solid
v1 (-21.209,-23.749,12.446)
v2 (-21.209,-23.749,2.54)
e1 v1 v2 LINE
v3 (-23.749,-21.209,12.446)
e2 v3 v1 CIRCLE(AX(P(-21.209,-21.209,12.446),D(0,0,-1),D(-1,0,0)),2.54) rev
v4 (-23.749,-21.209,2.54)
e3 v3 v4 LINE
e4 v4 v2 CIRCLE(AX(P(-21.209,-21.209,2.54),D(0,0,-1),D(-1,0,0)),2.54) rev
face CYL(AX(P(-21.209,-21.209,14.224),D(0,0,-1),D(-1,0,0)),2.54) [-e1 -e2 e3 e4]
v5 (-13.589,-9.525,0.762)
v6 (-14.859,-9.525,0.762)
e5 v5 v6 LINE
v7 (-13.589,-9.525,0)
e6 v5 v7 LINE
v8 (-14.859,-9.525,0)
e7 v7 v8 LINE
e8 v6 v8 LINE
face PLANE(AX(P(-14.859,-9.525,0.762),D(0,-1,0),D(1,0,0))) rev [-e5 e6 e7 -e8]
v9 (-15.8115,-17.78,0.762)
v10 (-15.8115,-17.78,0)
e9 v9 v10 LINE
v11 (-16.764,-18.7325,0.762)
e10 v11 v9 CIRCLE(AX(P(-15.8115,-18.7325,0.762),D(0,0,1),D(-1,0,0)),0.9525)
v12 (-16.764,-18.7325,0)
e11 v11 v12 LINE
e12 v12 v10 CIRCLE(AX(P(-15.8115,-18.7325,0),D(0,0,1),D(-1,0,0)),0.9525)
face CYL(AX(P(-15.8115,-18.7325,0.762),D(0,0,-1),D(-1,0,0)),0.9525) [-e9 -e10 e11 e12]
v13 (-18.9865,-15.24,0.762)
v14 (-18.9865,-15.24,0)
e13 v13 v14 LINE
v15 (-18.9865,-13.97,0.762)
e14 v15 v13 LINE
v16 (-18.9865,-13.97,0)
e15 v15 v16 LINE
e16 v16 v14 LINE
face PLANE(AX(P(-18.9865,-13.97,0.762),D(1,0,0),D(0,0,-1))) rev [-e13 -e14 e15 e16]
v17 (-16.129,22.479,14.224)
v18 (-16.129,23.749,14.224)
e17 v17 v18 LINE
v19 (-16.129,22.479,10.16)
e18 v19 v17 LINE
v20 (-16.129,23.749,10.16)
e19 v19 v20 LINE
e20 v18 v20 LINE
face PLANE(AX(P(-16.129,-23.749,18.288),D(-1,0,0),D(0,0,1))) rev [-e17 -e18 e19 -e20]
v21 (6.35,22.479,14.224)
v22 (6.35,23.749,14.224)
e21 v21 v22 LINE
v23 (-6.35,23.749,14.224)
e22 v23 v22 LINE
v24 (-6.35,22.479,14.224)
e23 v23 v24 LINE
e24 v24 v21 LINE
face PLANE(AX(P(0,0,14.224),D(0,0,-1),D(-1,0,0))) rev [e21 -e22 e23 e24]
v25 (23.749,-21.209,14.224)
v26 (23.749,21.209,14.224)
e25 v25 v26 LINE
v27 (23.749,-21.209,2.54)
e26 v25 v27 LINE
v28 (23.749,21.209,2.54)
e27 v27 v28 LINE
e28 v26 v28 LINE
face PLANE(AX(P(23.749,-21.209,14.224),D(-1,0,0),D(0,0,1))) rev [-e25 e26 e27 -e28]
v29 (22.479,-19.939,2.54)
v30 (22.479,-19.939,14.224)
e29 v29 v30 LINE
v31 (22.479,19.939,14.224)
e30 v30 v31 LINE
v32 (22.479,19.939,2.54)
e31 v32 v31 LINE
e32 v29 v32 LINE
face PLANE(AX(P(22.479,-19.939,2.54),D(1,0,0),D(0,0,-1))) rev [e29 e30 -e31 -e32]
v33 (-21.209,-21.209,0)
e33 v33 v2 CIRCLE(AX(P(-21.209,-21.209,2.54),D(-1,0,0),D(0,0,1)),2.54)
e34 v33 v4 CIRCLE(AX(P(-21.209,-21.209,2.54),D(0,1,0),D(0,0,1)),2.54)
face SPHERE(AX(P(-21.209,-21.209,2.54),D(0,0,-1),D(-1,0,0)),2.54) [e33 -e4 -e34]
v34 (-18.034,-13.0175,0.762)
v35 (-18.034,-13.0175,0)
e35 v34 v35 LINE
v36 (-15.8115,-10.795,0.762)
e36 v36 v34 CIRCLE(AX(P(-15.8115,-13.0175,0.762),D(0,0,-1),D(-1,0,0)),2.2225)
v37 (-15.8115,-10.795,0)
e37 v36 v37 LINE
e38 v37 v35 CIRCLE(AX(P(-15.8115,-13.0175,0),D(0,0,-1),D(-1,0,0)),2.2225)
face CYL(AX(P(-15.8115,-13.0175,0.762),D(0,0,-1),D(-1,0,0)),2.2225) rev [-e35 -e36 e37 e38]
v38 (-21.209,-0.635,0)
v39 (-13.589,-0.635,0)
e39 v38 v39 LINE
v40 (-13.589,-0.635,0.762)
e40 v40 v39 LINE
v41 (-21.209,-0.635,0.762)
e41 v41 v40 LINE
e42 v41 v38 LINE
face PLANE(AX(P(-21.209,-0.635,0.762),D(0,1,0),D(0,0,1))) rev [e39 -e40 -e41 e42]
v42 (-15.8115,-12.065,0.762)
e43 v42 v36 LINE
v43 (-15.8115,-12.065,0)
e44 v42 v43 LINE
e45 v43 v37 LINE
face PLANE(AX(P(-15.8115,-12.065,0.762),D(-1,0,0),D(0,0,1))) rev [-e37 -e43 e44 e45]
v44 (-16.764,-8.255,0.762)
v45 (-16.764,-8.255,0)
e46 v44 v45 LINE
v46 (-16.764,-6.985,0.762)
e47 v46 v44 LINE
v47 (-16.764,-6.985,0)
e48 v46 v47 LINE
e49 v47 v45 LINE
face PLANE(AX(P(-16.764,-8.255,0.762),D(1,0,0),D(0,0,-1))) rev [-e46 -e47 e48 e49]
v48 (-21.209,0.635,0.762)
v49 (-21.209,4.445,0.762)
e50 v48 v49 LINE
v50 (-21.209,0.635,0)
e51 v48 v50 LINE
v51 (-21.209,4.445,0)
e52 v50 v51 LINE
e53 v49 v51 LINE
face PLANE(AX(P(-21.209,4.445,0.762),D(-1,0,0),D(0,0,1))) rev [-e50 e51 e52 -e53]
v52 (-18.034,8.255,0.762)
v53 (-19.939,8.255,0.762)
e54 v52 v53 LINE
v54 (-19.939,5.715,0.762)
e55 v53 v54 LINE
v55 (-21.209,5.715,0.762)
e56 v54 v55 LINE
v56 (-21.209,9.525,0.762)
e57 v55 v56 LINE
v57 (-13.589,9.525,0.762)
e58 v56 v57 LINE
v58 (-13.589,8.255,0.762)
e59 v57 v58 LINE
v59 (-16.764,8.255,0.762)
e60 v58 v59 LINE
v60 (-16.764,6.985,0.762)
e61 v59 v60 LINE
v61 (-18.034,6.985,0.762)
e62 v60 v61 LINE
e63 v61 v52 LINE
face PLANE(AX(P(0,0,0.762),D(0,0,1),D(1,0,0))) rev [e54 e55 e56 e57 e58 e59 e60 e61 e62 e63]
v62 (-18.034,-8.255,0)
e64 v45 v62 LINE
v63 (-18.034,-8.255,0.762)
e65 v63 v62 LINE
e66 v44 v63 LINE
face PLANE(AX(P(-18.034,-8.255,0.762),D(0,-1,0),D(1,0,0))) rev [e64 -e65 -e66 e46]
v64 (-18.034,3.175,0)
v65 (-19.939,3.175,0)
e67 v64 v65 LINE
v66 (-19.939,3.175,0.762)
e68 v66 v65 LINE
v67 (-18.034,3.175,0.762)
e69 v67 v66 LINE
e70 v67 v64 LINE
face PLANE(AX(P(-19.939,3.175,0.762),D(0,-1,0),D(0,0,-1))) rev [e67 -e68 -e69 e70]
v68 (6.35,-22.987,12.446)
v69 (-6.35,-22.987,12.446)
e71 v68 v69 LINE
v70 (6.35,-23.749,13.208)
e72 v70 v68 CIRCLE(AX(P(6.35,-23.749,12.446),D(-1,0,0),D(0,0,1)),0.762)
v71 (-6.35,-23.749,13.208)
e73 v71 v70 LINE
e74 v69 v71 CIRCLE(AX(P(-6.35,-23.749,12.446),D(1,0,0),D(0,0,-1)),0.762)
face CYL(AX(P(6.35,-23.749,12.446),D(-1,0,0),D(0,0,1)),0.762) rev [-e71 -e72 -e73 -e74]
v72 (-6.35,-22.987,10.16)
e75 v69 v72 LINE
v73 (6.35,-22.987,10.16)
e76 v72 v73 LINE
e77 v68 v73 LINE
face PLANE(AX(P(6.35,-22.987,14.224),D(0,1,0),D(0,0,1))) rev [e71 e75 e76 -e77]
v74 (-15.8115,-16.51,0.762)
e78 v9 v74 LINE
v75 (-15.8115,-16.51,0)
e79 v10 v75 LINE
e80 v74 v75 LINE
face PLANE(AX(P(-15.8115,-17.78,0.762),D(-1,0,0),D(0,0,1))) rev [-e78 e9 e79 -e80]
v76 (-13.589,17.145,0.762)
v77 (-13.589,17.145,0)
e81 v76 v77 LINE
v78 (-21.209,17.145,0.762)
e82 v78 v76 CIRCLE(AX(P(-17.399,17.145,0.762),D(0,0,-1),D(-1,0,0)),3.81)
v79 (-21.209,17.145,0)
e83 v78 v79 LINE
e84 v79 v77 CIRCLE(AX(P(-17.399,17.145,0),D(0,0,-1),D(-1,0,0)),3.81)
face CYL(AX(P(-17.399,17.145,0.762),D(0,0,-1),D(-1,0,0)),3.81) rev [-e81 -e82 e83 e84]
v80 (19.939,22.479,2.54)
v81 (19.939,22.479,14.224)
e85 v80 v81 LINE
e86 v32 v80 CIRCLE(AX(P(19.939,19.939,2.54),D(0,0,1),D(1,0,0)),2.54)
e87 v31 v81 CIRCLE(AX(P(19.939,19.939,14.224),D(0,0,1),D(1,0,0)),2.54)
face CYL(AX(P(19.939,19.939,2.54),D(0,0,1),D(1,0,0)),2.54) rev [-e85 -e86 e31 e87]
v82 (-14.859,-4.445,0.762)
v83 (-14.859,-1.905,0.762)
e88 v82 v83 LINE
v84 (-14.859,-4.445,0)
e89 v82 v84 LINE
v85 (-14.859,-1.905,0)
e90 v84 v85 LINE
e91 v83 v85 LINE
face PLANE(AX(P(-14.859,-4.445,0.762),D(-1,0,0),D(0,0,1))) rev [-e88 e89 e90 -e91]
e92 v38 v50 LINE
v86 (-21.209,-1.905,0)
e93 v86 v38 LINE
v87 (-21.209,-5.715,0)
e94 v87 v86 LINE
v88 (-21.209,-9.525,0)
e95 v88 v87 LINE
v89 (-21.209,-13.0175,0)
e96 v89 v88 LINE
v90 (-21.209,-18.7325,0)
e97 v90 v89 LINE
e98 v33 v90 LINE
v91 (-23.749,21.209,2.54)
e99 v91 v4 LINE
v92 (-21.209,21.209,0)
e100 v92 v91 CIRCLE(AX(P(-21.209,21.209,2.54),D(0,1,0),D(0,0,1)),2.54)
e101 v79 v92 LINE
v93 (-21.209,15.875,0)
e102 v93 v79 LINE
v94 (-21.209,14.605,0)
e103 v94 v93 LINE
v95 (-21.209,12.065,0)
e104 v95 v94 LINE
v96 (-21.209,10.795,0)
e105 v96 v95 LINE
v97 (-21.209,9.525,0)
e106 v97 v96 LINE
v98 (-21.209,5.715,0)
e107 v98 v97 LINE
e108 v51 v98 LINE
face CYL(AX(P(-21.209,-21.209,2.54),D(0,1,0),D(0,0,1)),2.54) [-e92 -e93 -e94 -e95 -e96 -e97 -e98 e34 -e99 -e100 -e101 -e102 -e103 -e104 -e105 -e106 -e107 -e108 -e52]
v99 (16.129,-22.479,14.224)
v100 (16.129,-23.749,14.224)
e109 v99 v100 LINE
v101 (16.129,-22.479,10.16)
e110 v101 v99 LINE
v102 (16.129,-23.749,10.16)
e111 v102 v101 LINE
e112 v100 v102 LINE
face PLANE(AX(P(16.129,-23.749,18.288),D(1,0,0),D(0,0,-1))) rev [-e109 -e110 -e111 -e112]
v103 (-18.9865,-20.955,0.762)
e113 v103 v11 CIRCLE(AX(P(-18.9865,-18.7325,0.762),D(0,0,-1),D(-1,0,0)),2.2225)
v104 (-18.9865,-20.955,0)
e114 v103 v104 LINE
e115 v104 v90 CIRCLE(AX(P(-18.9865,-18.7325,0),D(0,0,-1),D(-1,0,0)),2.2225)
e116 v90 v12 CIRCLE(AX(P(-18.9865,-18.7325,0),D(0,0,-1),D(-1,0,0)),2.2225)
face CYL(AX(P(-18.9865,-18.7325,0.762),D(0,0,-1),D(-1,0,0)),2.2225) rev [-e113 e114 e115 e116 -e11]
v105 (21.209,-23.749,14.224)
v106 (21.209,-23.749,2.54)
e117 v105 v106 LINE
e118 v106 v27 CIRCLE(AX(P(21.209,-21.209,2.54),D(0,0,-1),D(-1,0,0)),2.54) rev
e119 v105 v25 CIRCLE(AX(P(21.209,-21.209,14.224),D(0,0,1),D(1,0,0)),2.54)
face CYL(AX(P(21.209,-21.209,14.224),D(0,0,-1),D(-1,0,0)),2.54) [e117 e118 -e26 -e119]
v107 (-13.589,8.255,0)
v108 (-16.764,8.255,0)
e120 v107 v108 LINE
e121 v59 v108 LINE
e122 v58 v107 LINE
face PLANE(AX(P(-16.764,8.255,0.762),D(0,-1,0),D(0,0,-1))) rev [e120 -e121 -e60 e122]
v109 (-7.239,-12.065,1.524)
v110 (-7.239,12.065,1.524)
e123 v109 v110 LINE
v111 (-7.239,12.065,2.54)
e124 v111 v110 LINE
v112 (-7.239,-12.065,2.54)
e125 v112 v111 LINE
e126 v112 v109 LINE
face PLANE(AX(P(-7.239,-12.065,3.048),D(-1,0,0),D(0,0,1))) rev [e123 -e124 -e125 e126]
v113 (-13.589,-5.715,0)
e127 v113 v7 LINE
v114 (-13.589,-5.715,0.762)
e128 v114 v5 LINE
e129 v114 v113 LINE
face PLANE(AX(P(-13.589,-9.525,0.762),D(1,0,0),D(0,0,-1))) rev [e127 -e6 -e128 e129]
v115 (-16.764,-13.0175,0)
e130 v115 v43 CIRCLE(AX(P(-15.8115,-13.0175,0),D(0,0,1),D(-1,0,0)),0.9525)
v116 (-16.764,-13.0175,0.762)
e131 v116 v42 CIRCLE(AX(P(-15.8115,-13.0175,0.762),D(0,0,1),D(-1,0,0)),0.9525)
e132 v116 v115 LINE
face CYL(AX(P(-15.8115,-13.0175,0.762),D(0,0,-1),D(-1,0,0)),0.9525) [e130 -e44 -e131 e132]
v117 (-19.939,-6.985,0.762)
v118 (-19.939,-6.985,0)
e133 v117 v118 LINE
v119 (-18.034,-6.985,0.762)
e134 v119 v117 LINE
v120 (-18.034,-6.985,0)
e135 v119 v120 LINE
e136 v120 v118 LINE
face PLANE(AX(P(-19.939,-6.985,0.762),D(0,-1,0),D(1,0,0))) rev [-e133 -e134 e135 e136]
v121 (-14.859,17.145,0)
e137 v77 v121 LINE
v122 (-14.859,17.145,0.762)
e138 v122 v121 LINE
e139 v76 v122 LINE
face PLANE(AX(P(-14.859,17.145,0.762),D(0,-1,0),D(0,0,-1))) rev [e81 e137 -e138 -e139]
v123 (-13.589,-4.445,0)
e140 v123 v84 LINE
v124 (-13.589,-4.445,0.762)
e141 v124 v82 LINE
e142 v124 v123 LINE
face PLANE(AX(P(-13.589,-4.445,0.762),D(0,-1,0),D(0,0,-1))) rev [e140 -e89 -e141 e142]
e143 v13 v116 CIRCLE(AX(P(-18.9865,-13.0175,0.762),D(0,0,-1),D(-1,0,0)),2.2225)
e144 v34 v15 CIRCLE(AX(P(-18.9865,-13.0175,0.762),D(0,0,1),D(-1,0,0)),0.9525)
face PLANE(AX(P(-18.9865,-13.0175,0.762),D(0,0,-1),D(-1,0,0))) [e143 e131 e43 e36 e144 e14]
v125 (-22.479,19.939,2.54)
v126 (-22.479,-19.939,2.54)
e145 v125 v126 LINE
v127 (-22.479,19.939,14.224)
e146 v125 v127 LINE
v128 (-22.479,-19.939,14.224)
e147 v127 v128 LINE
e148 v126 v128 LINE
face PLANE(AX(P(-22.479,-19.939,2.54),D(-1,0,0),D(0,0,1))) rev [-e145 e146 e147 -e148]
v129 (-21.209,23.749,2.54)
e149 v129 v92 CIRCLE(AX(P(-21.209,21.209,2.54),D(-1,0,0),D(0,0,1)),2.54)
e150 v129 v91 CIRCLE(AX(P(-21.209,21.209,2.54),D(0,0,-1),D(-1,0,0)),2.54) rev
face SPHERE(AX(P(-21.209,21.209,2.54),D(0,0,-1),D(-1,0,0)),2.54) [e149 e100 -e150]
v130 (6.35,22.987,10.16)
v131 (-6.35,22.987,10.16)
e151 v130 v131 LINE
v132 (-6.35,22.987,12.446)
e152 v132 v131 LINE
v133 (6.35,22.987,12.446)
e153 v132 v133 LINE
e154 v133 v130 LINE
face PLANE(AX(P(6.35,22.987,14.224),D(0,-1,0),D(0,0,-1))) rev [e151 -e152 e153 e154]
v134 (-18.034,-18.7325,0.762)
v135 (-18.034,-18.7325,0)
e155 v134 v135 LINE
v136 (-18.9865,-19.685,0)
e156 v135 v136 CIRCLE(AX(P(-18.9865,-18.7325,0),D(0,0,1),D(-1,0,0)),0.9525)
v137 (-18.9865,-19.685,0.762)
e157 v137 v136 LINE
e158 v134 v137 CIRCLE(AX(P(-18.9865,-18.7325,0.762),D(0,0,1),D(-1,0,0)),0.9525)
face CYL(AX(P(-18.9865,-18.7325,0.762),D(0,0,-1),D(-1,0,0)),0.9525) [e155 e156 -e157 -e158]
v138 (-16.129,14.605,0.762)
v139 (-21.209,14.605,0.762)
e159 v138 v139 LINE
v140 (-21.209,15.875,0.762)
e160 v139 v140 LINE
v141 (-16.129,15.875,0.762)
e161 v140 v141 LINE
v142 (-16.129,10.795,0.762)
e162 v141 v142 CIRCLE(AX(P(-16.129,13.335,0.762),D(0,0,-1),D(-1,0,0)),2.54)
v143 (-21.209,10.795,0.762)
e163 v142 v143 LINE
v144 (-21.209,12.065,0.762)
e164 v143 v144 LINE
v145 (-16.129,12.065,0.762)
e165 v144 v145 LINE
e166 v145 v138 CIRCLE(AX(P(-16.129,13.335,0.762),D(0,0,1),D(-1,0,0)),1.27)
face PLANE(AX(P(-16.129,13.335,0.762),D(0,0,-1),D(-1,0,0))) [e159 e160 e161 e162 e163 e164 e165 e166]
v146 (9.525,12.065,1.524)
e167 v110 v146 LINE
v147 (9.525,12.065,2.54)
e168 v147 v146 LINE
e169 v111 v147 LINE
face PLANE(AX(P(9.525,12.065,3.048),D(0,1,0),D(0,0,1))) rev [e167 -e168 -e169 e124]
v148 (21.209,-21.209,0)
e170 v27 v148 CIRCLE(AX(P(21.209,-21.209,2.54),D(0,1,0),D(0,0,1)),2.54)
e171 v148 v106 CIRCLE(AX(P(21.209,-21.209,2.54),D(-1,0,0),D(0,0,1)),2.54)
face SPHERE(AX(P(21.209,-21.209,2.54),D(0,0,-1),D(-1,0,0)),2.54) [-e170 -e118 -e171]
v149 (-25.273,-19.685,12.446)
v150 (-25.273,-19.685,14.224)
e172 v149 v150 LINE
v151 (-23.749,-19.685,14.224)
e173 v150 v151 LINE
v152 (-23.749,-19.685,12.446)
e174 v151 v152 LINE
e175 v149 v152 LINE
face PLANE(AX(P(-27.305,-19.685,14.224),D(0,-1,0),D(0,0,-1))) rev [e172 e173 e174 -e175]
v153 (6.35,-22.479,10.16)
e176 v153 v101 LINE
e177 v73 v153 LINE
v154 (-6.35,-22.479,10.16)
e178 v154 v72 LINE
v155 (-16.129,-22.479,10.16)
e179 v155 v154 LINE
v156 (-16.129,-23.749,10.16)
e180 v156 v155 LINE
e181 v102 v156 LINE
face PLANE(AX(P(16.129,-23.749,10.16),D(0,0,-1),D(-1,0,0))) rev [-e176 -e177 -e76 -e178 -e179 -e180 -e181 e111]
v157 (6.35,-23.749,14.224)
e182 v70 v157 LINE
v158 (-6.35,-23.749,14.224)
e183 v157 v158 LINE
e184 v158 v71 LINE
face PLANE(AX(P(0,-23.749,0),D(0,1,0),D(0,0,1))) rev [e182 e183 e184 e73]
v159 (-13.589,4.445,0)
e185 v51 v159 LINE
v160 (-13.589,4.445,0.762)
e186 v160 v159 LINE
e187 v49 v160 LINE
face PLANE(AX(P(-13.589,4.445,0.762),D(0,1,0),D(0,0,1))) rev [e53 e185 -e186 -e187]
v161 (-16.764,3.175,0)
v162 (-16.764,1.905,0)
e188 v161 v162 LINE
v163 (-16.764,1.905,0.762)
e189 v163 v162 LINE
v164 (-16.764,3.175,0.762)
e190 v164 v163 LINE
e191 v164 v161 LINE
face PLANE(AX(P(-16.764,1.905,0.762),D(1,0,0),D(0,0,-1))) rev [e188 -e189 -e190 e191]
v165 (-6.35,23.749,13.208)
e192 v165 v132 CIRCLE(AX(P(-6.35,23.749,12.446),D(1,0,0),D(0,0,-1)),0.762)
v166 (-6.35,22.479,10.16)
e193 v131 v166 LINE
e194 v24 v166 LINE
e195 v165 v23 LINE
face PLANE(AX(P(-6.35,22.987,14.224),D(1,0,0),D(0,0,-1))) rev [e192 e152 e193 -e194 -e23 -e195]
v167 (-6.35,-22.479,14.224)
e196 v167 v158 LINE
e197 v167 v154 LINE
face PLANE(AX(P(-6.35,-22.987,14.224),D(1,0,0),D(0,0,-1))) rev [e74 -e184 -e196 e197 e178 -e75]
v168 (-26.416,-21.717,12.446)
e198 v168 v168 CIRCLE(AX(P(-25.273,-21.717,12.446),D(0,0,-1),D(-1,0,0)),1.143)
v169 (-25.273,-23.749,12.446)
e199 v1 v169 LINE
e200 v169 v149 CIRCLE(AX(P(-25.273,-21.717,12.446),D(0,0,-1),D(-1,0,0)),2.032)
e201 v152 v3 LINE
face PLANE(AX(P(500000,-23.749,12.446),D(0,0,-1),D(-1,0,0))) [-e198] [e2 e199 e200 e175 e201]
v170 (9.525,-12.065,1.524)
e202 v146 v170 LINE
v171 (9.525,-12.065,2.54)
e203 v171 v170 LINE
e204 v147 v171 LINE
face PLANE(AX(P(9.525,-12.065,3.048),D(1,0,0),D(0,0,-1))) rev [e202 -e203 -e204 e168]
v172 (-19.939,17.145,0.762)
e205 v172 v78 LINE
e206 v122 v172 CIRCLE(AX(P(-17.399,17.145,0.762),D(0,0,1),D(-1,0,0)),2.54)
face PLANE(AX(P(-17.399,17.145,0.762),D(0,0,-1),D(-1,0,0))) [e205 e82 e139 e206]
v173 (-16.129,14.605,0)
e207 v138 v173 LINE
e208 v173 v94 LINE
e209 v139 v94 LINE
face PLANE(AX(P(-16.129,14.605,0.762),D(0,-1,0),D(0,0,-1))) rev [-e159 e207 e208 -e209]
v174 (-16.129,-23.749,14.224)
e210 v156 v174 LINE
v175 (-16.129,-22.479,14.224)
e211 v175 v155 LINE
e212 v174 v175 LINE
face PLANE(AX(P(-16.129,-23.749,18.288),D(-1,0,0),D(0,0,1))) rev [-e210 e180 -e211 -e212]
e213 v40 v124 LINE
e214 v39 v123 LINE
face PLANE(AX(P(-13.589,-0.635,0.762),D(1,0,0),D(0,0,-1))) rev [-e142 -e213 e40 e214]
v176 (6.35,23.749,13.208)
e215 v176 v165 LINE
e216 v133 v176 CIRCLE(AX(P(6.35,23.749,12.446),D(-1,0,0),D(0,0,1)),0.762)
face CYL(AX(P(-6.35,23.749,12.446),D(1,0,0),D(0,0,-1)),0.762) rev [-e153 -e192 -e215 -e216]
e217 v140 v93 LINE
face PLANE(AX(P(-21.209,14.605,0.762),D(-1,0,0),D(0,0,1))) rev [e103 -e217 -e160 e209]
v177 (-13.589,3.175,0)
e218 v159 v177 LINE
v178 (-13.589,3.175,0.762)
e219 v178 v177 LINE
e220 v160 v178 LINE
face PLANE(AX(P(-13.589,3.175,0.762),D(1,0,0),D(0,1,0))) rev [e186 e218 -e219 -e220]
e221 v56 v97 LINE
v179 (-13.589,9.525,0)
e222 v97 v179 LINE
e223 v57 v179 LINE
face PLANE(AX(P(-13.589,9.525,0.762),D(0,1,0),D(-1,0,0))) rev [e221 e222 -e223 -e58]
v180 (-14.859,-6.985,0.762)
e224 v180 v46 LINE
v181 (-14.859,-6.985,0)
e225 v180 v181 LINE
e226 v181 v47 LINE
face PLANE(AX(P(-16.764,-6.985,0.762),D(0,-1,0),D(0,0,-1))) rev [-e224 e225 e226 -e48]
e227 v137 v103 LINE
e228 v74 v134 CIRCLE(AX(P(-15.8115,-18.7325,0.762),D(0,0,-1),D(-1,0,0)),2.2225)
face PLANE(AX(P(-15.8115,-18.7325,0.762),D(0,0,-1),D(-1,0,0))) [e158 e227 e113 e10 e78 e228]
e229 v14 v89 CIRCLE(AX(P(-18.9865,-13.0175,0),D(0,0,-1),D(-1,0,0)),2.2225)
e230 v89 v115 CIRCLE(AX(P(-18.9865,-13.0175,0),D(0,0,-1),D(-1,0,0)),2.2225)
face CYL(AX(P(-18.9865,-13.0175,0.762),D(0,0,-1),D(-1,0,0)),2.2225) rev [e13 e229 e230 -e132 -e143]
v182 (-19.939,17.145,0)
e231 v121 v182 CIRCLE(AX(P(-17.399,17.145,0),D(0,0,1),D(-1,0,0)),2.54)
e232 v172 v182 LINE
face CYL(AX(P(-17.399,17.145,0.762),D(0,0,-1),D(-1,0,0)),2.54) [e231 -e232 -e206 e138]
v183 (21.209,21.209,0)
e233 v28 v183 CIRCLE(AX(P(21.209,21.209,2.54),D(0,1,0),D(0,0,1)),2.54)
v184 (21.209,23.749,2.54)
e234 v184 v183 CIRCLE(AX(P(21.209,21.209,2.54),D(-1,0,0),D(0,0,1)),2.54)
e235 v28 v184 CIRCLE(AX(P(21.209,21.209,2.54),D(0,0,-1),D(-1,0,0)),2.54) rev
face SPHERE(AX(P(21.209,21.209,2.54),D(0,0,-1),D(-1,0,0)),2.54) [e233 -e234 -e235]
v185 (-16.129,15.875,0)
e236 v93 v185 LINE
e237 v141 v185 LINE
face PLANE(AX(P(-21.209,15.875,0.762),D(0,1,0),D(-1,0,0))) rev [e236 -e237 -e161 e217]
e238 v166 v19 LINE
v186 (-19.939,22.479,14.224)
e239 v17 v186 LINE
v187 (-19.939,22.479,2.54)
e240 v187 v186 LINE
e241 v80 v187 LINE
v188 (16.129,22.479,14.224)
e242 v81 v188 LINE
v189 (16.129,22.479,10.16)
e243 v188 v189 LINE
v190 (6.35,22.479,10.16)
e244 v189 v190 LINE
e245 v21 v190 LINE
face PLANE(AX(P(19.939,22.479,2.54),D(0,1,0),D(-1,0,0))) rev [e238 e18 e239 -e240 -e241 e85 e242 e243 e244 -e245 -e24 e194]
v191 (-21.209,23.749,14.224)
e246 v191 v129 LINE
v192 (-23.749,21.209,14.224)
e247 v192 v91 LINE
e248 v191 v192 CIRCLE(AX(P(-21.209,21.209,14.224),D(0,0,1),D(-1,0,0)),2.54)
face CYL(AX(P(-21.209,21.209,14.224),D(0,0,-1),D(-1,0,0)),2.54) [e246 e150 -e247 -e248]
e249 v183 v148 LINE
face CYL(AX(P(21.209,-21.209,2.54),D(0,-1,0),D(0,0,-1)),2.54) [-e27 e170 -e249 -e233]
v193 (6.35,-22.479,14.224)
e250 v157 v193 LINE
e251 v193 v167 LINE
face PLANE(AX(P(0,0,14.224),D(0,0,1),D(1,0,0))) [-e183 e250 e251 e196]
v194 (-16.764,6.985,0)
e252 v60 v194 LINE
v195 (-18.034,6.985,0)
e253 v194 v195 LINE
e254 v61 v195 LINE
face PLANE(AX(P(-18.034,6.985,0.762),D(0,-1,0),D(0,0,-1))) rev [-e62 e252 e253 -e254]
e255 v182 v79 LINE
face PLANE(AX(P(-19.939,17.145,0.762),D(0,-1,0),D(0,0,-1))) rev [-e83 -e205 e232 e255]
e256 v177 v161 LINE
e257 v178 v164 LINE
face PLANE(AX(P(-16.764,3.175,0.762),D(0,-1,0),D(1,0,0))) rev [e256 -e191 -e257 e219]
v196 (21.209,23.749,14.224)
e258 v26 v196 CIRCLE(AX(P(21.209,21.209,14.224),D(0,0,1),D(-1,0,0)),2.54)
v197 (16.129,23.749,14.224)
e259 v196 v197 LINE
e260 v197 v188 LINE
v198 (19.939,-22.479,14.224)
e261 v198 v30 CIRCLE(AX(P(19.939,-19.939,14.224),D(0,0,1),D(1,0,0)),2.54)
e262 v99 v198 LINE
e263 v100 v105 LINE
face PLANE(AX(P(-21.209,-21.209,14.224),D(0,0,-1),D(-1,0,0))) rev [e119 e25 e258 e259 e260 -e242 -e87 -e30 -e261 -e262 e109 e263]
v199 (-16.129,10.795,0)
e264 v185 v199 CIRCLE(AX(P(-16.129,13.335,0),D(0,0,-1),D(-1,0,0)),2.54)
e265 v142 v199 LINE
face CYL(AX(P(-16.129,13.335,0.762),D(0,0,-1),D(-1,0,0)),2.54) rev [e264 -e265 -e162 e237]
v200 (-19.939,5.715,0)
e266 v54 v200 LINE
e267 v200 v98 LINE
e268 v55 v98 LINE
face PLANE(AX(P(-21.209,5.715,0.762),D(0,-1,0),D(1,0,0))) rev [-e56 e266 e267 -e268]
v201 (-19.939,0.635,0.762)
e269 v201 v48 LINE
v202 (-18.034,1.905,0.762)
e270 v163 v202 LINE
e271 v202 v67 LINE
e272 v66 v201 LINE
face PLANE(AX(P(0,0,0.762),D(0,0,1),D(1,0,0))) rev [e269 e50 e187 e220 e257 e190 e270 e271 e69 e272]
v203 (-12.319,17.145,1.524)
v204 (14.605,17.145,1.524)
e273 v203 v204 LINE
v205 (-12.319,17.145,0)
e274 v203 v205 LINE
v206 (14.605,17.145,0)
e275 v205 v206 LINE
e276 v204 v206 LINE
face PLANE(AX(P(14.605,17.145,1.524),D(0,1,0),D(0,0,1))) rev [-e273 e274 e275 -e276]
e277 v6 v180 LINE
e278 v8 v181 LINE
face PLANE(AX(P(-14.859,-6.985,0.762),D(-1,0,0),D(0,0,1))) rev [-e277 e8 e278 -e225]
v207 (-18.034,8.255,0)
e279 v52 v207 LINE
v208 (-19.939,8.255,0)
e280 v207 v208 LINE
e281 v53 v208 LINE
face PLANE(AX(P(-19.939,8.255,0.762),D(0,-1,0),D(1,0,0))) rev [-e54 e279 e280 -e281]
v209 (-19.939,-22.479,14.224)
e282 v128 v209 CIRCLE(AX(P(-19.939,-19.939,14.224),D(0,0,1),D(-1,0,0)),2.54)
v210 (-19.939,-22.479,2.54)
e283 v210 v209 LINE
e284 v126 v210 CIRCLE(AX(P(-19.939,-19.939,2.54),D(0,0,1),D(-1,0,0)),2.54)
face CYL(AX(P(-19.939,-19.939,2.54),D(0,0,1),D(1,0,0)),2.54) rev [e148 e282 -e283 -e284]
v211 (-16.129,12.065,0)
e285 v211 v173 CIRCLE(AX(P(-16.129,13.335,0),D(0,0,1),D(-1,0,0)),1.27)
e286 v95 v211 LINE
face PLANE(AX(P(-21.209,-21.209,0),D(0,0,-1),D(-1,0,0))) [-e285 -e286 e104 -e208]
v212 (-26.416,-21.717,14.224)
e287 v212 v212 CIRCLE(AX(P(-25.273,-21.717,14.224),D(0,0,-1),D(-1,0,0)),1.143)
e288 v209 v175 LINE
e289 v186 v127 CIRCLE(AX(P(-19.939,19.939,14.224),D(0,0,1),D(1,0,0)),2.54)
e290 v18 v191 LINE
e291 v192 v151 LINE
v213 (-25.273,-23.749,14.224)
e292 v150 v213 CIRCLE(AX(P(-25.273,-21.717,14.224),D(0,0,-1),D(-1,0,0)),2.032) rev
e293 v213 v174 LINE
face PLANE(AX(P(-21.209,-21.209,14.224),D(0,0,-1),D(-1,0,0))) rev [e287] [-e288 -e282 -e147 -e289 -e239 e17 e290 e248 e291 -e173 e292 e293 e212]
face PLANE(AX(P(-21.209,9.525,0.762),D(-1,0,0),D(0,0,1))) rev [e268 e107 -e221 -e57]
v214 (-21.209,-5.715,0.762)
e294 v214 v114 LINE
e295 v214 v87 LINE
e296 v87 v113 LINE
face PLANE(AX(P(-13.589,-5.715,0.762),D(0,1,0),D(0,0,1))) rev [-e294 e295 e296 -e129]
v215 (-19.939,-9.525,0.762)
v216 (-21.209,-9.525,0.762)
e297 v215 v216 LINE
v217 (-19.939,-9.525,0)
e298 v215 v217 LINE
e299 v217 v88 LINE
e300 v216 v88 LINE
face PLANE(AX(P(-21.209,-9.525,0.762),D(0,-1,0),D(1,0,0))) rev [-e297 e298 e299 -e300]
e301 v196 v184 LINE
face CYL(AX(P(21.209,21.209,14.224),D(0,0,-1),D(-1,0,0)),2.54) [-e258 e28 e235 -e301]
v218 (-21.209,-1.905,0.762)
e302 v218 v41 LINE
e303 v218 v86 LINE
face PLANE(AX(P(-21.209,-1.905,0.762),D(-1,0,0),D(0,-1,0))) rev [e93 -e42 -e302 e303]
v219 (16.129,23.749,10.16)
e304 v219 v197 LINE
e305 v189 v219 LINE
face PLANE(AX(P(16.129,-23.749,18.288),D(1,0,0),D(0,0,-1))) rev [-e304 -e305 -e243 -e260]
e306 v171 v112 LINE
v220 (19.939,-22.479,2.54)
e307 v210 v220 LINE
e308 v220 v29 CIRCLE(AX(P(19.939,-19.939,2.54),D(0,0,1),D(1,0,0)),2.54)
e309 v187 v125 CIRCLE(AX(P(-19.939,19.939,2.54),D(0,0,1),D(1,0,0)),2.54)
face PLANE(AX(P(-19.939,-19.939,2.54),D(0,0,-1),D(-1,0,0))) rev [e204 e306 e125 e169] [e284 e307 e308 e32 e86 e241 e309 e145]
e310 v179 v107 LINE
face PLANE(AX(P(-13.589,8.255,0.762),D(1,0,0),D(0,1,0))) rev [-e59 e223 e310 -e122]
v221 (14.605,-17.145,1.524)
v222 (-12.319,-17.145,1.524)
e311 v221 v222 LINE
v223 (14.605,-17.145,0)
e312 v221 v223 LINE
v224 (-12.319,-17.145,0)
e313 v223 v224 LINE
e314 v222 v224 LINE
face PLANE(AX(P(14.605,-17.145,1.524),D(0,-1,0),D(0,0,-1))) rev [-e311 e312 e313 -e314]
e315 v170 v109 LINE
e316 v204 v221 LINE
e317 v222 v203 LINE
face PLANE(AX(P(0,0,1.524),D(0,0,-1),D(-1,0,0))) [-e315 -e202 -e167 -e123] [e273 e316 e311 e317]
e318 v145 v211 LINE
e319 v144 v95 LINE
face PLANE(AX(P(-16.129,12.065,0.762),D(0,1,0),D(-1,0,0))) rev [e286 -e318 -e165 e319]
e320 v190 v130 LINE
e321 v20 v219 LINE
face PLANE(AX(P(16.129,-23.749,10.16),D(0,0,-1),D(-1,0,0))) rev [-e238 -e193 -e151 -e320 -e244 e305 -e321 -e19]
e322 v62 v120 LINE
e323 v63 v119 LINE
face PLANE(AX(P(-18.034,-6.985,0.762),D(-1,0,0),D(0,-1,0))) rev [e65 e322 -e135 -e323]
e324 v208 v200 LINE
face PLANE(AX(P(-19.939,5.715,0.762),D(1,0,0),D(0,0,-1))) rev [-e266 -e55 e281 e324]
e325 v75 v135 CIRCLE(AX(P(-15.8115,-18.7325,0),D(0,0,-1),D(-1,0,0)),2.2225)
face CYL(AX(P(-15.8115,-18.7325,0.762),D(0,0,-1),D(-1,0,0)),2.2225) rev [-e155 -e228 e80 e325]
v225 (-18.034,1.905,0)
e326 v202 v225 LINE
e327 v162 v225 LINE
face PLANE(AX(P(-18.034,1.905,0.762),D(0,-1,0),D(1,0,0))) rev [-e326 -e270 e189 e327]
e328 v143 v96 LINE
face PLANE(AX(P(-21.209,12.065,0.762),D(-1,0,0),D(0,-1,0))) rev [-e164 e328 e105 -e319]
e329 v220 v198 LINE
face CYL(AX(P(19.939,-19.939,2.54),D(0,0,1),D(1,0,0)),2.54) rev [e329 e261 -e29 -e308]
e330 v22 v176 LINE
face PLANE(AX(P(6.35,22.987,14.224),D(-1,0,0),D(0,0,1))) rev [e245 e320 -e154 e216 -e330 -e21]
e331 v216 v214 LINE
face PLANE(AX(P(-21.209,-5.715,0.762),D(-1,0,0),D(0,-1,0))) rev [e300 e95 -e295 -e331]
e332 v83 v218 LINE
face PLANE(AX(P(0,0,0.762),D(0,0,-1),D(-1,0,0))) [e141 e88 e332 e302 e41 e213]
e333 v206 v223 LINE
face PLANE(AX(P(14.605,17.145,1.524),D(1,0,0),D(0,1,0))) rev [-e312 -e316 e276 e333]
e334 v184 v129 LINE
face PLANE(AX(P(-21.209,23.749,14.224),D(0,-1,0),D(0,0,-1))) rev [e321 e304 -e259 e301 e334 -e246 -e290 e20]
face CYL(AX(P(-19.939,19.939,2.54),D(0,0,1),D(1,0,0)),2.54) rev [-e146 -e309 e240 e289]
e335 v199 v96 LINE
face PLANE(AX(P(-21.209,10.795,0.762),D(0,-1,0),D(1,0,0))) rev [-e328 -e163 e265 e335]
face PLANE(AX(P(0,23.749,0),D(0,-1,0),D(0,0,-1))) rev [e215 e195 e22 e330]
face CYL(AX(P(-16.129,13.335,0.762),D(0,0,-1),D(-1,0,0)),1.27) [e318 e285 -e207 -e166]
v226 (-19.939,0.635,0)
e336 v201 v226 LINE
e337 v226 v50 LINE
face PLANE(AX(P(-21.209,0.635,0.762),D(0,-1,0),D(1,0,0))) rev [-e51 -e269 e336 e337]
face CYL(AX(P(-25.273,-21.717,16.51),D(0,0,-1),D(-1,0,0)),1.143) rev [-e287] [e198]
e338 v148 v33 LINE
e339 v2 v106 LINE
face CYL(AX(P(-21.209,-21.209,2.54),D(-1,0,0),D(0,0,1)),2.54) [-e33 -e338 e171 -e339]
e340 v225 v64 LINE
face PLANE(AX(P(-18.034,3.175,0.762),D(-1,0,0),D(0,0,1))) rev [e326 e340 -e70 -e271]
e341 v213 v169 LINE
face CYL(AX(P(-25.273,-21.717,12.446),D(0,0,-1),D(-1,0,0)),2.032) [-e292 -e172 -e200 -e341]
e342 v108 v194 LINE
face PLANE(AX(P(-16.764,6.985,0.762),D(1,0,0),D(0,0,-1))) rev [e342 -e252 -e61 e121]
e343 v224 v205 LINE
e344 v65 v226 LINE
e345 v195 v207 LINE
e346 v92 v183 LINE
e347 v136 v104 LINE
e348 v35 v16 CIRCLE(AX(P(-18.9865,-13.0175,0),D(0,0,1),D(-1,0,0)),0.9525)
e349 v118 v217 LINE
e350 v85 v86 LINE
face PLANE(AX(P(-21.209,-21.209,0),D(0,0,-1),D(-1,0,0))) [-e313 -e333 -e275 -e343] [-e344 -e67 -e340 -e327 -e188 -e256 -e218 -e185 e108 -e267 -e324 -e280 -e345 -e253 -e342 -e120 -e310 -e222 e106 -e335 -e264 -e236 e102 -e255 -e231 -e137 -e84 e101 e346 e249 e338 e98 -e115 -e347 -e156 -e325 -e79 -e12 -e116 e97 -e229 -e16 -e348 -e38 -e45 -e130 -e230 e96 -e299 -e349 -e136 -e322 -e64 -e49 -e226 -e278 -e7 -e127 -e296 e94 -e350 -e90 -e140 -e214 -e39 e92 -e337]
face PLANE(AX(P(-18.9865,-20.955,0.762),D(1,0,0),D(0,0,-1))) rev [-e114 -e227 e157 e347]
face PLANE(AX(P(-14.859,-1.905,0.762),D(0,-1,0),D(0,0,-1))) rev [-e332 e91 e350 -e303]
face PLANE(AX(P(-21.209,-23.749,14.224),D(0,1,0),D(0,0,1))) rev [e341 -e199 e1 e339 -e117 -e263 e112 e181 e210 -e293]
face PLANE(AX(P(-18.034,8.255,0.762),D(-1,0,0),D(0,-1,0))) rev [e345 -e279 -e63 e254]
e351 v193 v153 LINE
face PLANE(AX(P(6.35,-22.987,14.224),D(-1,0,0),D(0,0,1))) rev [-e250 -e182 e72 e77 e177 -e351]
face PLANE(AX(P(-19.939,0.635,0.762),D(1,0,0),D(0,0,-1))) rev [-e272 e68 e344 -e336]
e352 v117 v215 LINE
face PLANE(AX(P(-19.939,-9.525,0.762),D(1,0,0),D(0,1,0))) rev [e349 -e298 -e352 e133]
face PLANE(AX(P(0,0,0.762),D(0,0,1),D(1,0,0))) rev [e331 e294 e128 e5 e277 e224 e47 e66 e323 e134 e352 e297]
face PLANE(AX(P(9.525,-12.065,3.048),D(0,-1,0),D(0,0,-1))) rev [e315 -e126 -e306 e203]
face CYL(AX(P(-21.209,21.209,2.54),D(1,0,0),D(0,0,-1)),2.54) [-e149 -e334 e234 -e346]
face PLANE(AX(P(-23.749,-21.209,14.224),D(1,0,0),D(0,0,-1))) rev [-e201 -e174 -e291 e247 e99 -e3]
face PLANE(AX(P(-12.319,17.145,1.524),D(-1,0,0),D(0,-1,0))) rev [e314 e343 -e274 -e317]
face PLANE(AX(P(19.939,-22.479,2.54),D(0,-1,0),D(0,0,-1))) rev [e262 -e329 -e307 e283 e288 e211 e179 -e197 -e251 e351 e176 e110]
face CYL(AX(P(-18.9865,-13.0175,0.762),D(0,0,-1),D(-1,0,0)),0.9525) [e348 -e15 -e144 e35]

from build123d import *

# Parameters (mm, degrees)
BOSS_EXTRUDE1_DEPTH             = 14.224
CUT_EXTRUDE1_DEPTH              = 11.684
FILLET1_R                       = 2.54
CUT_EXTRUDE2_DEPTH              = 55.976332917
CUT_EXTRUDE2_DEPTH_BACK         = 55.976332917
SKETCH3_W                       = 32.258
SKETCH3_H                       = 8.128
SKETCH5_W                       = 26.924
SKETCH5_H                       = 34.29
CUT_EXTRUDE4_DEPTH              = 1.524
SKETCH6_W                       = 16.764
SKETCH6_H                       = 24.13
CUT_EXTRUDE5_DEPTH              = 1.524
SKETCH8_W                       = 12.7
SKETCH8_H                       = 0.508
BOSS_EXTRUDE3_DEPTH             = 4.064
SKETCH9_W                       = 12.7
SKETCH9_H                       = 1.016
BOSS_EXTRUDE4_DEPTH             = 0.762
FILLET2_R                       = 0.762
SKETCH10_W                      = 12.7
SKETCH10_H                      = 1.016
BOSS_EXTRUDE5_DEPTH             = 0.762
FILLET3_R                       = 0.762
SKETCH11_W                      = 1.778
SKETCH11_H                      = 4.064
BOSS_EXTRUDE6_DEPTH             = 3.556
BOSS_EXTRUDE6_DIRECTION_2_REACH = 56.976
FILLET4_RADIUS                  = 2.032
FILLET4_LENGTH                  = 1.778
SKETCH12_R                      = 1.143
CUT_EXTRUDE7_DEPTH              = 4.064
CUT_EXTRUDE8_DEPTH              = 0.762


with BuildPart() as part:
    # Sketch1 → Boss-Extrude1 (new body)
    with BuildSketch(Plane.XY):
        with BuildLine():
            Line((-21.209, -23.749), (21.209, -23.749))
            ThreePointArc((21.209, -23.749), (23.005051224, -23.005051224), (23.749, -21.209))
            Line((23.749, -21.209), (23.749, 21.209))
            ThreePointArc((23.749, 21.209), (23.005051224, 23.005051224), (21.209, 23.749))
            Line((21.209, 23.749), (-21.209, 23.749))
            ThreePointArc((-21.209, 23.749), (-23.005051224, 23.005051224), (-23.749, 21.209))
            Line((-23.749, 21.209), (-23.749, -21.209))
            ThreePointArc((-23.749, -21.209), (-23.005051224, -23.005051224), (-21.209, -23.749))
        make_face()
    extrude(amount=BOSS_EXTRUDE1_DEPTH)

    # Sketch2 → Cut-Extrude1 (cut)
    with BuildSketch(Plane.XY.offset(14.224)):
        with BuildLine():
            Line((19.939, -22.479), (-19.939, -22.479))
            ThreePointArc((-19.939, -22.479), (-21.735051224, -21.735051224), (-22.479, -19.939))
            Line((-22.479, -19.939), (-22.479, 19.939))
            ThreePointArc((-22.479, 19.939), (-21.735051224, 21.735051224), (-19.939, 22.479))
            Line((-19.939, 22.479), (19.939, 22.479))
            ThreePointArc((19.939, 22.479), (21.735051224, 21.735051224), (22.479, 19.939))
            Line((22.479, 19.939), (22.479, -19.939))
            ThreePointArc((22.479, -19.939), (21.735051224, -21.735051224), (19.939, -22.479))
        make_face()
    extrude(amount=-CUT_EXTRUDE1_DEPTH, mode=Mode.SUBTRACT)

    # Fillet1
    fillet1_edges = [part.edges().sort_by_distance(p)[0] for p in [
        (0, -23.749, 0),
        (-23.005051224, -23.005051224, 0),
        (-23.749, 0, 0),
        (-23.005051224, 23.005051224, 0),
        (0, 23.749, 0),
        (23.005051224, 23.005051224, 0),
        (23.749, 0, 0),
        (23.005051224, -23.005051224, 0),
    ]]
    fillet(fillet1_edges, radius=FILLET1_R)

    # Sketch3 → Cut-Extrude2 (cut, two sides: drawn at the far end of the back side and taken through both)
    with BuildSketch(Plane(origin=(0, 23.749, 0), x_dir=(1, 0, 0), z_dir=(0, 1, 0)).offset(-CUT_EXTRUDE2_DEPTH_BACK)):
        with Locations((0, -14.224)):
            Rectangle(SKETCH3_W, SKETCH3_H)
    extrude(amount=CUT_EXTRUDE2_DEPTH + CUT_EXTRUDE2_DEPTH_BACK, mode=Mode.SUBTRACT)

    # Sketch5 → Cut-Extrude4 (cut)
    with BuildSketch(Plane(origin=(0, 0, 0), x_dir=(-1, 0, 0), z_dir=(0, 0, -1))):
        with Locations((-1.143, 0)):
            Rectangle(SKETCH5_W, SKETCH5_H)
    extrude(amount=-CUT_EXTRUDE4_DEPTH, mode=Mode.SUBTRACT)

    # Sketch6 → Cut-Extrude5 (cut)
    with BuildSketch(Plane(origin=(0, 0, 1.524), x_dir=(-1, 0, 0), z_dir=(0, 0, -1))):
        with Locations((-1.143, 0)):
            Rectangle(SKETCH6_W, SKETCH6_H)
    extrude(amount=-CUT_EXTRUDE5_DEPTH, mode=Mode.SUBTRACT)

    # Sketch8 → Boss-Extrude3 (add)
    with BuildSketch(Plane.XY.offset(10.16)):
        with Locations((0, 22.733)):
            Rectangle(SKETCH8_W, SKETCH8_H)
        with Locations((0, -22.733)):
            Rectangle(SKETCH8_W, SKETCH8_H)
    extrude(amount=BOSS_EXTRUDE3_DEPTH)

    # Sketch9 → Boss-Extrude4 (add)
    with BuildSketch(Plane(origin=(0, 22.987, 0), x_dir=(1, 0, 0), z_dir=(0, 1, 0))):
        with Locations((0, -13.716)):
            Rectangle(SKETCH9_W, SKETCH9_H)
    extrude(amount=BOSS_EXTRUDE4_DEPTH)

    # Fillet2
    fillet2_edges = [part.edges().sort_by_distance(p)[0] for p in [
        (0, 22.987, 13.208),
    ]]
    fillet(fillet2_edges, radius=FILLET2_R - 0.0001)  # a hair under: the kernel refuses the full size

    # Sketch10 → Boss-Extrude5 (add)
    with BuildSketch(Plane.XZ.offset(22.987)):
        with Locations((0, 13.716)):
            Rectangle(SKETCH10_W, SKETCH10_H)
    extrude(amount=BOSS_EXTRUDE5_DEPTH)

    # Fillet3
    fillet3_edges = [part.edges().sort_by_distance(p)[0] for p in [
        (0, -22.987, 13.208),
    ]]
    fillet(fillet3_edges, radius=FILLET3_R - 0.0001)  # a hair under: the kernel refuses the full size

    # Sketch11 → Boss-Extrude6 (add)
    with BuildSketch(Plane.ZY.offset(23.749)):
        with Locations((13.335, -21.717)):
            Rectangle(SKETCH11_W, SKETCH11_H)
    extrude(amount=BOSS_EXTRUDE6_DEPTH)

    # Sketch11 → Boss-Extrude6 direction 2 (add, up to next)
    with BuildSketch(Plane.ZY.offset(23.749), mode=Mode.PRIVATE) as boss_extrude6_direction_2_sk1:
        with Locations((13.335, -21.717)):
            Rectangle(SKETCH11_W, SKETCH11_H)
    boss_extrude6_direction_2_tool1 = extrude(boss_extrude6_direction_2_sk1.sketch, amount=-BOSS_EXTRUDE6_DIRECTION_2_REACH, mode=Mode.PRIVATE) - part.part
    add(boss_extrude6_direction_2_tool1.solids().sort_by_distance((-23.749, -21.717, 13.335))[0])

    # Fillet4: full round fillet: the end face becomes a half cylinder, R = half its width
    fillet4_face = Plane((-27.305, -21.717, 13.335), x_dir=(0, 0, -1), z_dir=(-1, 0, 0))  # on the end face: x along it, z out of the body
    fillet4_slab = fillet4_face.offset(-FILLET4_RADIUS / 2) * Box(FILLET4_LENGTH, 2 * FILLET4_RADIUS, FILLET4_RADIUS, mode=Mode.PRIVATE)  # the body's end, R deep
    fillet4_round = Plane((-25.273, -21.717, 13.335), x_dir=(-1, 0, 0), z_dir=(0, 0, -1)) * Cylinder(FILLET4_RADIUS, FILLET4_LENGTH, mode=Mode.PRIVATE)  # its axis R under the face
    add(fillet4_slab - fillet4_round, mode=Mode.SUBTRACT)

    # Sketch12 → Cut-Extrude7 (cut)
    with BuildSketch(Plane(origin=(0, 0, 12.446), x_dir=(-1, 0, 0), z_dir=(0, 0, -1))):
        with Locations((25.273, -21.717)):
            Circle(SKETCH12_R)
    extrude(amount=-CUT_EXTRUDE7_DEPTH, mode=Mode.SUBTRACT)

    # Sketch7 → Cut-Extrude8 (cut)
    with BuildSketch(Plane(origin=(0, 0, 0), x_dir=(-1, 0, 0), z_dir=(0, 0, -1))):
        with BuildLine():
            Line((19.939, 17.145), (21.209, 17.145))
            ThreePointArc((21.209, 17.145), (17.399, 20.955), (13.589, 17.145))
            Line((13.589, 17.145), (14.859, 17.145))
            ThreePointArc((14.859, 17.145), (17.399, 19.685), (19.939, 17.145))
        make_face()
        with BuildLine():
            Line((21.209, 15.875), (16.129, 15.875))
            ThreePointArc((16.129, 15.875), (13.589, 13.335), (16.129, 10.795))
            Line((16.129, 10.795), (21.209, 10.795))
            Line((21.209, 10.795), (21.209, 12.065))
            Line((21.209, 12.065), (16.129, 12.065))
            ThreePointArc((16.129, 12.065), (14.859, 13.335), (16.129, 14.605))
            Line((16.129, 14.605), (21.209, 14.605))
            Line((21.209, 14.605), (21.209, 15.875))
        make_face()
        Polygon((13.589, 9.525), (21.209, 9.525), (21.209, 5.715), (19.939, 5.715), (19.939, 8.255), (18.034, 8.255), (18.034, 6.985), (16.764, 6.985), (16.764, 8.255), (13.589, 8.255), align=None)
        Polygon((13.589, 4.445), (21.209, 4.445), (21.209, 0.635), (19.939, 0.635), (19.939, 3.175), (18.034, 3.175), (18.034, 1.905), (16.764, 1.905), (16.764, 3.175), (13.589, 3.175), align=None)
        Polygon((21.209, -0.635), (13.589, -0.635), (13.589, -4.445), (14.859, -4.445), (14.859, -1.905), (21.209, -1.905), align=None)
        Polygon((13.589, -5.715), (21.209, -5.715), (21.209, -9.525), (19.939, -9.525), (19.939, -6.985), (18.034, -6.985), (18.034, -8.255), (16.764, -8.255), (16.764, -6.985), (14.859, -6.985), (14.859, -9.525), (13.589, -9.525), align=None)
        with BuildLine():
            Line((18.9865, -13.97), (18.9865, -15.24))
            ThreePointArc((18.9865, -15.24), (20.558044821, -11.445955179), (16.764, -13.0175))
            ThreePointArc((16.764, -13.0175), (15.137980791, -13.691019209), (15.8115, -12.065))
            Line((15.8115, -12.065), (15.8115, -10.795))
            ThreePointArc((15.8115, -10.795), (14.239955179, -14.589044821), (18.034, -13.0175))
            ThreePointArc((18.034, -13.0175), (19.660019209, -12.343980791), (18.9865, -13.97))
        make_face()
        with BuildLine():
            Line((15.8115, -17.78), (15.8115, -16.51))
            ThreePointArc((15.8115, -16.51), (14.239955179, -20.304044821), (18.034, -18.7325))
            ThreePointArc((18.034, -18.7325), (19.660019209, -18.058980791), (18.9865, -19.685))
            Line((18.9865, -19.685), (18.9865, -20.955))
            ThreePointArc((18.9865, -20.955), (20.558044821, -17.160955179), (16.764, -18.7325))
            ThreePointArc((16.764, -18.7325), (15.137980791, -19.406019209), (15.8115, -17.78))
        make_face()
    extrude(amount=-CUT_EXTRUDE8_DEPTH, mode=Mode.SUBTRACT)


solid = part.part
